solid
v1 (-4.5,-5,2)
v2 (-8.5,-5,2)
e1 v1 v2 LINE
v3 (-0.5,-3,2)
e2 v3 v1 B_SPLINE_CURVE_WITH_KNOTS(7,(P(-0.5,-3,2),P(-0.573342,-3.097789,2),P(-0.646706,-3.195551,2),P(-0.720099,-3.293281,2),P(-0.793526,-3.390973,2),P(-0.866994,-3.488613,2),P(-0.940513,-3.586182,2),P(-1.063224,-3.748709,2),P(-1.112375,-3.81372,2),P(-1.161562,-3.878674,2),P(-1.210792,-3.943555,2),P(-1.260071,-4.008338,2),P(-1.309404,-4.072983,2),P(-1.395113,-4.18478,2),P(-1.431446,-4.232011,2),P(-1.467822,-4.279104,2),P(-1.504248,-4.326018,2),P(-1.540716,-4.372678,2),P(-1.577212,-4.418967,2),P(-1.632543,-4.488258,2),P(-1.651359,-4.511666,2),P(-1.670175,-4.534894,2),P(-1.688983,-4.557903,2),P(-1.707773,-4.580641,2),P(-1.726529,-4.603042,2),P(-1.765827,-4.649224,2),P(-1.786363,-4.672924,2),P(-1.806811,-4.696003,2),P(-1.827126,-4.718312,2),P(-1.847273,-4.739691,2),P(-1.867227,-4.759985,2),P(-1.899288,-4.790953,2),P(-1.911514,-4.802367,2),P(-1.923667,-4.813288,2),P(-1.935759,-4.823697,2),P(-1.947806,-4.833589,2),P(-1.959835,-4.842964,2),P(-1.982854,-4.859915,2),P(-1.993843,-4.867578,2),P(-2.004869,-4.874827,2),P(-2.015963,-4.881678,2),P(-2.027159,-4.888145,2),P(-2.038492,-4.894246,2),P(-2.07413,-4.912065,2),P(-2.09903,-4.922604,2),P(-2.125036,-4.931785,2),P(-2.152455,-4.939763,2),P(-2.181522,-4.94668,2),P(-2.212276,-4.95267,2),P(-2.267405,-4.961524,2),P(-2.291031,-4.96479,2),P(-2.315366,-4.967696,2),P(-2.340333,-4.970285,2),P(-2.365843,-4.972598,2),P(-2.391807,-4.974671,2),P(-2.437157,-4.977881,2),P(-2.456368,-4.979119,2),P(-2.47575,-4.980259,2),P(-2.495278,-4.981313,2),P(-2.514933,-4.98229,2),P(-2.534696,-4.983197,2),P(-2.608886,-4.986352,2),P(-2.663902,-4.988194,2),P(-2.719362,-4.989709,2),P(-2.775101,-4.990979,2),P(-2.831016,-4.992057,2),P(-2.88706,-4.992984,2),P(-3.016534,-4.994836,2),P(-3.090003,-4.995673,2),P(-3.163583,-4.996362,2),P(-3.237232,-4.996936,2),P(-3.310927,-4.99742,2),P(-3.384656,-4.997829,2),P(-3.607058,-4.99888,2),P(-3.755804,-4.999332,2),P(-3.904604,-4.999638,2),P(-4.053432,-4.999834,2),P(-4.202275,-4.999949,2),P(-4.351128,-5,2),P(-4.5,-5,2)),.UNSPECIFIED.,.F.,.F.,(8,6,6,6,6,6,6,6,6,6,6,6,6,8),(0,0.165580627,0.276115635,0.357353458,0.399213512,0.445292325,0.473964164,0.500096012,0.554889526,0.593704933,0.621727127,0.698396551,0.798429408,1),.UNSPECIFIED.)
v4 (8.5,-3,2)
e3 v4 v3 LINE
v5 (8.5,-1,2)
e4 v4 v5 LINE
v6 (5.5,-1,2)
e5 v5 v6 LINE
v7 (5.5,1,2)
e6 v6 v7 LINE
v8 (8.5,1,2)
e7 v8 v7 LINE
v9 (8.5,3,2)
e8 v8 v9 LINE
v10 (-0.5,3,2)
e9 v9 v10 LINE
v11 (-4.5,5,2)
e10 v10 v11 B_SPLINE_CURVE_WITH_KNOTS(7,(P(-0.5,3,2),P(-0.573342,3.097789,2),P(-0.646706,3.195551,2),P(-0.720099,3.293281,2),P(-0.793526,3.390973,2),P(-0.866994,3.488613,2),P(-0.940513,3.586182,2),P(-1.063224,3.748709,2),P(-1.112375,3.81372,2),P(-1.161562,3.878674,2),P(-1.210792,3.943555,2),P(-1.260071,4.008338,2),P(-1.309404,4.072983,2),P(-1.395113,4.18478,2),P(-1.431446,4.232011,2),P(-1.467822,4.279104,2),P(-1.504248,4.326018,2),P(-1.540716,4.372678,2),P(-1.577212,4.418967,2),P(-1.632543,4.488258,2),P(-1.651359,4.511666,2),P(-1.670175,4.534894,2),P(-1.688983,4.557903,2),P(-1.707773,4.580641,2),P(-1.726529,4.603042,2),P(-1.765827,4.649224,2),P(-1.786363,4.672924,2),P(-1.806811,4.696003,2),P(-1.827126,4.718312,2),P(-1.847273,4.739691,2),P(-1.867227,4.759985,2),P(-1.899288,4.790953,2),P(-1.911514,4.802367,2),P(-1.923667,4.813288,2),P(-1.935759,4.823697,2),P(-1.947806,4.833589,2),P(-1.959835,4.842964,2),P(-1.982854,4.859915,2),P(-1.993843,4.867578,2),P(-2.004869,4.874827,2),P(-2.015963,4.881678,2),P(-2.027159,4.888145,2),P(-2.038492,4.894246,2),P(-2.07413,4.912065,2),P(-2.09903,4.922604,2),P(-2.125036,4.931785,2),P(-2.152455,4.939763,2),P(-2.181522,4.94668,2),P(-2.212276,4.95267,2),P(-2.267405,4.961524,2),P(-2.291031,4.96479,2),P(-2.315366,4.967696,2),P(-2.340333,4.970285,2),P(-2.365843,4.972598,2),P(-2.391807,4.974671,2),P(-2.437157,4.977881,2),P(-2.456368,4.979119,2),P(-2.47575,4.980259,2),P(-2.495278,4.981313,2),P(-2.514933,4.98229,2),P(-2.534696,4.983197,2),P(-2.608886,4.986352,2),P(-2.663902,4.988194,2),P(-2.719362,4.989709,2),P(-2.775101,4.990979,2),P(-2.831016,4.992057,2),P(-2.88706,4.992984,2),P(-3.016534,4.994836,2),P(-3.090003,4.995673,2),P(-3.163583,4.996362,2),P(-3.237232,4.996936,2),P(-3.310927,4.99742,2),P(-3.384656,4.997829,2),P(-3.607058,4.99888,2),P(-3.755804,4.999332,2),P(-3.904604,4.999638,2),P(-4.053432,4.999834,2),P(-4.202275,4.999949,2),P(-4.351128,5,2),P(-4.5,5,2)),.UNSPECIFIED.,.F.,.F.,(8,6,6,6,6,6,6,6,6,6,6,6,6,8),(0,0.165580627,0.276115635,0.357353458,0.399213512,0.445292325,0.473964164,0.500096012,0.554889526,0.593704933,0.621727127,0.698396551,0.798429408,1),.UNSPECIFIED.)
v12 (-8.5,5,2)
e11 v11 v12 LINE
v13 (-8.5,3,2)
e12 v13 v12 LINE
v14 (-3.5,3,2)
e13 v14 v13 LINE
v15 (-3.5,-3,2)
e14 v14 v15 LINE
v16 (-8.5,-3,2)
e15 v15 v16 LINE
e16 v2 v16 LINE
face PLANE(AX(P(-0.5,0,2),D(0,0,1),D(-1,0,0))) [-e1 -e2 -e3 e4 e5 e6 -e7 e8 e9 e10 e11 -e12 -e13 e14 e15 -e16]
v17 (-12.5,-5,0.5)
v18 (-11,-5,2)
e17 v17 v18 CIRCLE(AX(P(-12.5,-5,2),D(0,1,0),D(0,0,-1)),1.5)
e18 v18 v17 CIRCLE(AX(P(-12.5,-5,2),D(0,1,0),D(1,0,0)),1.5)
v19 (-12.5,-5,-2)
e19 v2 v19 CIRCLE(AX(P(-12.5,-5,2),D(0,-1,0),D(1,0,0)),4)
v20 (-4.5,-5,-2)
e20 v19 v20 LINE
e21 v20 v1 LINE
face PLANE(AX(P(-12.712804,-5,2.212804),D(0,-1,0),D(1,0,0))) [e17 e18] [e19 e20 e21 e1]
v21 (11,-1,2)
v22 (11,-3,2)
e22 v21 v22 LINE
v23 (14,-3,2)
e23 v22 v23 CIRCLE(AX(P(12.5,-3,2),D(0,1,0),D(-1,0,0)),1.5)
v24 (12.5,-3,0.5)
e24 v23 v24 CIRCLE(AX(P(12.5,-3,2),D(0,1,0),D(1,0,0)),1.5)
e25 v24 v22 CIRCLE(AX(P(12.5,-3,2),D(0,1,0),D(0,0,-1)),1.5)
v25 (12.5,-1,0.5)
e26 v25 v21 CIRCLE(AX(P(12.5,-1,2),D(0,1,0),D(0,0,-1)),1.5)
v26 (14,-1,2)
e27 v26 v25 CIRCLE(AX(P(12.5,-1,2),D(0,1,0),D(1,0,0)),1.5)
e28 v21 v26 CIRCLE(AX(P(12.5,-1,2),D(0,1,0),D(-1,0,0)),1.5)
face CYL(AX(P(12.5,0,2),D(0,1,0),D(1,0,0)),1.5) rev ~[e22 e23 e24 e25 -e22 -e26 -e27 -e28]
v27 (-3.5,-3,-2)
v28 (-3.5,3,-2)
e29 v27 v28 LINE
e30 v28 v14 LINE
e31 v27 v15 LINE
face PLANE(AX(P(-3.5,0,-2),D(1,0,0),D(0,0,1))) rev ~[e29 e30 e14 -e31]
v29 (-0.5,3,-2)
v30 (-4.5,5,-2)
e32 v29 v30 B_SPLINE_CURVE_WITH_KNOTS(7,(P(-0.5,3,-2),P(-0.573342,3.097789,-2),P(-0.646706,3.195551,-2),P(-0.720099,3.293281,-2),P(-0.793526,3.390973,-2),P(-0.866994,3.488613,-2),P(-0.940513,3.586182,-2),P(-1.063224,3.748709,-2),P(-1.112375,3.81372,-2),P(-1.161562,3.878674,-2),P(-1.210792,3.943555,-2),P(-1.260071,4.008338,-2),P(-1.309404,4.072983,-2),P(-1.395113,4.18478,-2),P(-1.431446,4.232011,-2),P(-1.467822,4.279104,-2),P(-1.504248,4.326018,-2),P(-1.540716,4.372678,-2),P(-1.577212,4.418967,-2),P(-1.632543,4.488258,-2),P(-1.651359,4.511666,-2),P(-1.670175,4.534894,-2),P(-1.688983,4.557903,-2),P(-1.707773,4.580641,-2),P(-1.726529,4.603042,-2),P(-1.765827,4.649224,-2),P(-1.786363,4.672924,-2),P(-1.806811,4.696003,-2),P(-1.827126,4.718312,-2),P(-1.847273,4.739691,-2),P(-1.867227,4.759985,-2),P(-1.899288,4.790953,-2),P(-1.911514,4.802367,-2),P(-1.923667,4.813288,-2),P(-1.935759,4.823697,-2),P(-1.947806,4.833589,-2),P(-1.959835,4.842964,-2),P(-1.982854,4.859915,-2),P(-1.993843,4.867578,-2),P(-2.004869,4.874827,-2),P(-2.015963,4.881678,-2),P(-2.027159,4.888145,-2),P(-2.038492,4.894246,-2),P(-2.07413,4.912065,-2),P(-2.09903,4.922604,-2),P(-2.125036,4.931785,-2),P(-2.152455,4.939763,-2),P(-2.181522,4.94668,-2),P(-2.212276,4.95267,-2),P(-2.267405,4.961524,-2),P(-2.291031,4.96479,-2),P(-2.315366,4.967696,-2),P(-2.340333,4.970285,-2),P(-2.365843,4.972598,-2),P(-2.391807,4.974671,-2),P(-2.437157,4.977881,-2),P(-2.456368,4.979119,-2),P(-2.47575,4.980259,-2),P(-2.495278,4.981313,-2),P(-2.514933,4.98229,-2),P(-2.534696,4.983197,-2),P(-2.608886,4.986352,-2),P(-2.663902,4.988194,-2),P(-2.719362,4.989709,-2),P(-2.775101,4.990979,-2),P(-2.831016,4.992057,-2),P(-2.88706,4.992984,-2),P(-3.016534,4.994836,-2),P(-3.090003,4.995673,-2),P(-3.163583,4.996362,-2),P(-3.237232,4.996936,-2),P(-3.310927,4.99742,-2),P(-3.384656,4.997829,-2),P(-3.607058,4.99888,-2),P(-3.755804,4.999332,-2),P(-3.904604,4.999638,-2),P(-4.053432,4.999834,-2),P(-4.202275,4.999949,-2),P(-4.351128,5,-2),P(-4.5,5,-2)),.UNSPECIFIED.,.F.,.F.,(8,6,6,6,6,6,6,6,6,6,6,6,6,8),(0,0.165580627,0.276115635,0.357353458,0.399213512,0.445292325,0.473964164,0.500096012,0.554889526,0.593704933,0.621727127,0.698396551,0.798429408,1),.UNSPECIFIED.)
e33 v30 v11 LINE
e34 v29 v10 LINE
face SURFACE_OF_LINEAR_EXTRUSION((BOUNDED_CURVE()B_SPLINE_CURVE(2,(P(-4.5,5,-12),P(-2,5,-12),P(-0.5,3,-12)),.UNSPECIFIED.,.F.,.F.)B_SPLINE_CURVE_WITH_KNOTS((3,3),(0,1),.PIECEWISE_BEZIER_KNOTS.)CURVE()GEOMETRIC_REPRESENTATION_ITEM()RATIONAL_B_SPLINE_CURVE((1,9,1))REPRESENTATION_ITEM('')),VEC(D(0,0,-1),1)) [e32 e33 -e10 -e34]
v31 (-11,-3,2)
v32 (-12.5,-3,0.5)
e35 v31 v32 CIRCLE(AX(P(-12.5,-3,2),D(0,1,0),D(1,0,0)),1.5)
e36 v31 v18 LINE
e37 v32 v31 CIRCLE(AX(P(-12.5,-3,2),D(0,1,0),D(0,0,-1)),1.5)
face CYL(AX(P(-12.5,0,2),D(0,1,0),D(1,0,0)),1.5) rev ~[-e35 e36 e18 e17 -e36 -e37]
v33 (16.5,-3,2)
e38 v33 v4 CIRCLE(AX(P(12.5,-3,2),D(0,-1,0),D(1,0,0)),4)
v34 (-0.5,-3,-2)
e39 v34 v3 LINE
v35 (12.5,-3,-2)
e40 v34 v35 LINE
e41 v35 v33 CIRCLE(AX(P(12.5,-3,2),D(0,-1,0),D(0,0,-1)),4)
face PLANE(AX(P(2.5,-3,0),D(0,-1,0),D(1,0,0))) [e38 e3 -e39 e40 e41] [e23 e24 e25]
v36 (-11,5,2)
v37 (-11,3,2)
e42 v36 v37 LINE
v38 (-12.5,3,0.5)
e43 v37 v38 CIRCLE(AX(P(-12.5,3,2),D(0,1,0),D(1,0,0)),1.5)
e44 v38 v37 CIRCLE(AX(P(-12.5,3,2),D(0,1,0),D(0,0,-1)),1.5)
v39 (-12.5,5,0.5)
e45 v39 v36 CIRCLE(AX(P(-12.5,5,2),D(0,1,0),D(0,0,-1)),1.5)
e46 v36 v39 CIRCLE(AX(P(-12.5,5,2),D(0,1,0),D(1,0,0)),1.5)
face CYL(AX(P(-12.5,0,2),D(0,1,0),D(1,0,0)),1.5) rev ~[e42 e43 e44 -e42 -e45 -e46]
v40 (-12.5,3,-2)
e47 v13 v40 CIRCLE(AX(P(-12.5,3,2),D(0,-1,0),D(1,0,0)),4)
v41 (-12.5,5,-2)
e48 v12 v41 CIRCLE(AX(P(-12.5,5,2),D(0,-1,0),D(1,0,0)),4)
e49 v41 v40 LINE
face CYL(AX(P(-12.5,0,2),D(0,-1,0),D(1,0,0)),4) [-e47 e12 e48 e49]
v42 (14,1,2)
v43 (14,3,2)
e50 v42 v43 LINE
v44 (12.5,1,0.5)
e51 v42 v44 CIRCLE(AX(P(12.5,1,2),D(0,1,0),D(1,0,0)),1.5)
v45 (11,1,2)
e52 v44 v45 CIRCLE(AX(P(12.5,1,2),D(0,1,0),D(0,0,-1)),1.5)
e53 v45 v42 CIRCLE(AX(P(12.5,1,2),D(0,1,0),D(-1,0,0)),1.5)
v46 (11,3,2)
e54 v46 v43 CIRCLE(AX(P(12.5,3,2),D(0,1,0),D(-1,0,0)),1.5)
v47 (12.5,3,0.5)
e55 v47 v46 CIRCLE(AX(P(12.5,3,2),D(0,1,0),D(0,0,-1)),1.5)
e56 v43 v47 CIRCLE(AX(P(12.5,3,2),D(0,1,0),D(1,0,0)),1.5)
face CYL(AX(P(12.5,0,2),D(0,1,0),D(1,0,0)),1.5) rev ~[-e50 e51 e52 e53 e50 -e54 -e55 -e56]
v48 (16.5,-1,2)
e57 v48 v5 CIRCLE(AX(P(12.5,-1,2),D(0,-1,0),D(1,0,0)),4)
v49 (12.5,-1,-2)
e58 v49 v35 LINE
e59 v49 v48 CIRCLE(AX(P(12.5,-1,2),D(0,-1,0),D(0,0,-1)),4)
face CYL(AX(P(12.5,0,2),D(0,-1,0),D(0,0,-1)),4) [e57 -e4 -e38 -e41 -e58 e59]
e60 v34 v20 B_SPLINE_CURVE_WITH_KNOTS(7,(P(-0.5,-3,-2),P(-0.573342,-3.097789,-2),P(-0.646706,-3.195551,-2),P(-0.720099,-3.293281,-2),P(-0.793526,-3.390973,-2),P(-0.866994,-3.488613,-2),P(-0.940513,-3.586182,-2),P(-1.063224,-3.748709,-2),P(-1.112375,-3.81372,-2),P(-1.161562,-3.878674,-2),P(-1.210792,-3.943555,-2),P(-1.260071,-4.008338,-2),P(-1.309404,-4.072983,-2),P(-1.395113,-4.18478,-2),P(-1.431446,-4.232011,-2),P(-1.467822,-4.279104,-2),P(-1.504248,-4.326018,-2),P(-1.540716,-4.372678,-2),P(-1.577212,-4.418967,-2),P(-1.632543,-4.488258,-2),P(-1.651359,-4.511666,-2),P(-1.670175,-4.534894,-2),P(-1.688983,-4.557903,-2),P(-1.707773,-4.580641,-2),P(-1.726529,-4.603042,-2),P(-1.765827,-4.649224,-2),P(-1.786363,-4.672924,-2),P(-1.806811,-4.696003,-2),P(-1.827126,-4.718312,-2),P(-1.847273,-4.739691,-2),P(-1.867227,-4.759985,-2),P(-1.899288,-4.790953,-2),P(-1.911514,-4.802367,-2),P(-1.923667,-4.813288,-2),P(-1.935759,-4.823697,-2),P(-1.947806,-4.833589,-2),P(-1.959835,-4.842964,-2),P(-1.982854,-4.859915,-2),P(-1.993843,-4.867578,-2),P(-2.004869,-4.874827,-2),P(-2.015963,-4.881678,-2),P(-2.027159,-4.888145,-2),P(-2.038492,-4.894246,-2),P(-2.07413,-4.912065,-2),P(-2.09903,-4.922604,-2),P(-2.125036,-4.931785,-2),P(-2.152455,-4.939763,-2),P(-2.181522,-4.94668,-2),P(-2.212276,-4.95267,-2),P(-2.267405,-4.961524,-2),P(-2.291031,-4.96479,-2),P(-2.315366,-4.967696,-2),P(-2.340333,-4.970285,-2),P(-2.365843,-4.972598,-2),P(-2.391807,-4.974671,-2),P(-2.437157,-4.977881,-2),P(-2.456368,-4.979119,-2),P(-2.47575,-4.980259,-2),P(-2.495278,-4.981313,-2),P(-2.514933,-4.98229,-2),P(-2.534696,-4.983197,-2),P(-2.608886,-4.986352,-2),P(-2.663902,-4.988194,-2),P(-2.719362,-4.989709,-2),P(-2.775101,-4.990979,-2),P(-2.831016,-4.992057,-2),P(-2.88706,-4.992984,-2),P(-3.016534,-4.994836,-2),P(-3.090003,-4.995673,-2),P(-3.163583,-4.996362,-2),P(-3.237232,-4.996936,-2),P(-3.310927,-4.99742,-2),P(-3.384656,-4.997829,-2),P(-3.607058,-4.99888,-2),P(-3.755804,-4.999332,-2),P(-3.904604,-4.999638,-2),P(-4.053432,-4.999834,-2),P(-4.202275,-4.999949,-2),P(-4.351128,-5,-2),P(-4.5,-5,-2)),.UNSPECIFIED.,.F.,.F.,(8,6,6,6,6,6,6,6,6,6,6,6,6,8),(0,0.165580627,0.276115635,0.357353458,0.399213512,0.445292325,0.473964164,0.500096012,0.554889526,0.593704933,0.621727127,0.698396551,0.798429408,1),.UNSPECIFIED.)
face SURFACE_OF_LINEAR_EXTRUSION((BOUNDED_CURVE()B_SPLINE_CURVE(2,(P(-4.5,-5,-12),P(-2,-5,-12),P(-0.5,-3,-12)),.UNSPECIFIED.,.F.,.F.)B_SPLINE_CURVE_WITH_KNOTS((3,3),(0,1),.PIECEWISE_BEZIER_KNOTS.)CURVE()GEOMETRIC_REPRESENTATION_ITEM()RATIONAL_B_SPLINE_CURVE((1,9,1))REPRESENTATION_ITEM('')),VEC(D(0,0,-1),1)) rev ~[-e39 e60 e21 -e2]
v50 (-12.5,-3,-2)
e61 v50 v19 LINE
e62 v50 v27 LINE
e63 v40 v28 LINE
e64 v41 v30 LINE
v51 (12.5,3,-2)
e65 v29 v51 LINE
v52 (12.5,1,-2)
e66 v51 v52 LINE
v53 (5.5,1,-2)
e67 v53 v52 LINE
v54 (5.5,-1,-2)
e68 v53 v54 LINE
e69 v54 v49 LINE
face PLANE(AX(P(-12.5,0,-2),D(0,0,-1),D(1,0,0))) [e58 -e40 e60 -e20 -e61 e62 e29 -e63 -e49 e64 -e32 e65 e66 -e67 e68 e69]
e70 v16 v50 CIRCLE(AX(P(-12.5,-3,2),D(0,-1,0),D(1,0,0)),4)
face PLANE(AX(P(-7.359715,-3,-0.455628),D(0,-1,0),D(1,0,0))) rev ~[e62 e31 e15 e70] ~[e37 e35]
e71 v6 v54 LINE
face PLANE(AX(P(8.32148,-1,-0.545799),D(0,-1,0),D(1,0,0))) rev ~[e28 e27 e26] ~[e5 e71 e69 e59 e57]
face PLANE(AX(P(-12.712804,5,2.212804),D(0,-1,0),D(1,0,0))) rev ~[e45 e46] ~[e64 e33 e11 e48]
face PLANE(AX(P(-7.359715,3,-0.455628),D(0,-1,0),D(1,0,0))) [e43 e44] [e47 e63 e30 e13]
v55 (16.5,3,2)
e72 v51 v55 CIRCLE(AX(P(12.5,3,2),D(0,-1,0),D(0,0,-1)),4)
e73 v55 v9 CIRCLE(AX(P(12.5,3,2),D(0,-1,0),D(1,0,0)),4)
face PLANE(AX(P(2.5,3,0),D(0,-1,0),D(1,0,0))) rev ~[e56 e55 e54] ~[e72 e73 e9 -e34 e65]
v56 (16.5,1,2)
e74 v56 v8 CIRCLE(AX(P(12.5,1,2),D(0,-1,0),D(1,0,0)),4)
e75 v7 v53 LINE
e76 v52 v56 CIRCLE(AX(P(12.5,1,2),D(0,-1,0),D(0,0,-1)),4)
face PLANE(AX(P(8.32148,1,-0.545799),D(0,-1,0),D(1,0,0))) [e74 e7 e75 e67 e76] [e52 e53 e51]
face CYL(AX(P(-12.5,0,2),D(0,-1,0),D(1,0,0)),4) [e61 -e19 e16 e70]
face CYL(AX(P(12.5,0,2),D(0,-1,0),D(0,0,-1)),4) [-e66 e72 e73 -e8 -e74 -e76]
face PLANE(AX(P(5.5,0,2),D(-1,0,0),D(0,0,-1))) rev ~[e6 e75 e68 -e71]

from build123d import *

# Parameters (mm, degrees)
F0_W        = 3
F0_H        = 4
F1_DEPTH    = 5
F0_W_2      = 6
F2_DEPTH    = 3
F3_DEPTH    = 3
F4_DEPTH    = 1
F5_T1_DEPTH = 24


# Not quite as in the source:
# - a fillet or chamfer that OpenCascade refuses, or shapes differently, is made with other operations: its cross-section is extruded or revolved along the edge and cut away or added


with BuildPart() as f1:
    # F0 (on Front) → F1 (new body, symmetric)
    with BuildSketch(Plane.XZ):
        with BuildLine():
            Line((-11, 2), (-8.5, 2))
            ThreePointArc((-8.5, 2), (-15.3284271247, 4.8284271247), (-12.5, -2))
            Line((-12.5, -2), (-12.5, 0.5))
            ThreePointArc((-12.5, 0.5), (-13.5606601718, 3.0606601718), (-11, 2))
        make_face()
        with BuildLine():
            ThreePointArc((-12.5, -2), (-9.6715728753, -0.8284271247), (-8.5, 2))
            Line((-8.5, 2), (-11, 2))
            ThreePointArc((-11, 2), (-11.4393398282, 0.9393398282), (-12.5, 0.5))
            Line((-12.5, 0.5), (-12.5, -2))
        make_face()
        with BuildLine():
            Line((-3.5, -2), (-3.5, 2))
            Line((-3.5, 2), (-8.5, 2))
            ThreePointArc((-8.5, 2), (-9.6715728753, -0.8284271247), (-12.5, -2))
            Line((-12.5, -2), (-3.5, -2))
        make_face()
        with Locations((-2, 0)):
            Rectangle(F0_W, F0_H)
    extrude(amount=F1_DEPTH, both=True)

    # F0 (on Front) → F2 (join, symmetric)
    with BuildSketch(Plane.XZ):
        with Locations((2.5, 0)):
            Rectangle(F0_W_2, F0_H)
        with BuildLine():
            Line((8.5, 2), (5.5, 2))
            Line((5.5, 2), (5.5, -2))
            Line((5.5, -2), (12.5, -2))
            ThreePointArc((12.5, -2), (9.6715728753, -0.8284271247), (8.5, 2))
        make_face()
        with BuildLine():
            Line((11, 2), (8.5, 2))
            ThreePointArc((8.5, 2), (9.6715728753, -0.8284271247), (12.5, -2))
            Line((12.5, -2), (12.5, 0.5))
            ThreePointArc((12.5, 0.5), (11.4393398282, 0.9393398282), (11, 2))
        make_face()
        with BuildLine():
            ThreePointArc((16.5, 2), (12.5, 6), (8.5, 2))
            Line((8.5, 2), (11, 2))
            ThreePointArc((11, 2), (12.5, 3.5), (14, 2))
            ThreePointArc((14, 2), (13.5606601718, 0.9393398282), (12.5, 0.5))
            Line((12.5, 0.5), (12.5, -2))
            ThreePointArc((12.5, -2), (15.3284271247, -0.8284271247), (16.5, 2))
        make_face()
    extrude(amount=F2_DEPTH, both=True)

    # F0 (on Front) → F3 (cut, symmetric)
    with BuildSketch(Plane.XZ):
        with BuildLine():
            Line((-3.5, -2), (-3.5, 2))
            Line((-3.5, 2), (-8.5, 2))
            ThreePointArc((-8.5, 2), (-9.6715728753, -0.8284271247), (-12.5, -2))
            Line((-12.5, -2), (-3.5, -2))
        make_face()
        with BuildLine():
            ThreePointArc((-12.5, -2), (-9.6715728753, -0.8284271247), (-8.5, 2))
            Line((-8.5, 2), (-11, 2))
            ThreePointArc((-11, 2), (-11.4393398282, 0.9393398282), (-12.5, 0.5))
            Line((-12.5, 0.5), (-12.5, -2))
        make_face()
        with BuildLine():
            Line((-11, 2), (-8.5, 2))
            ThreePointArc((-8.5, 2), (-15.3284271247, 4.8284271247), (-12.5, -2))
            Line((-12.5, -2), (-12.5, 0.5))
            ThreePointArc((-12.5, 0.5), (-13.5606601718, 3.0606601718), (-11, 2))
        make_face()
    extrude(amount=F3_DEPTH, both=True, mode=Mode.SUBTRACT)

    # F0 (on Front) → F4 (cut, symmetric)
    with BuildSketch(Plane.XZ):
        with BuildLine():
            Line((8.5, 2), (5.5, 2))
            Line((5.5, 2), (5.5, -2))
            Line((5.5, -2), (12.5, -2))
            ThreePointArc((12.5, -2), (9.6715728753, -0.8284271247), (8.5, 2))
        make_face()
        with BuildLine():
            Line((11, 2), (8.5, 2))
            ThreePointArc((8.5, 2), (9.6715728753, -0.8284271247), (12.5, -2))
            Line((12.5, -2), (12.5, 0.5))
            ThreePointArc((12.5, 0.5), (11.4393398282, 0.9393398282), (11, 2))
        make_face()
        with BuildLine():
            ThreePointArc((16.5, 2), (12.5, 6), (8.5, 2))
            Line((8.5, 2), (11, 2))
            ThreePointArc((11, 2), (12.5, 3.5), (14, 2))
            ThreePointArc((14, 2), (13.5606601718, 0.9393398282), (12.5, 0.5))
            Line((12.5, 0.5), (12.5, -2))
            ThreePointArc((12.5, -2), (15.3284271247, -0.8284271247), (16.5, 2))
        make_face()
    extrude(amount=F4_DEPTH, both=True, mode=Mode.SUBTRACT)

    # F5: fillet of radius 5 on 2 edges, made by hand

    # F5_s2 → F5_t1 (cut)
    with BuildSketch(Plane.XY.offset(-12)):
        with BuildLine():
            add(Edge.make_bspline(
                [(-4.5, -5), (-2, -5), (-0.5, -3)],
                knots=[0, 0, 0, 1, 1, 1], degree=2, weights=[1, 9, 1]))
            Line((-0.5, -3), (-0.5, -5))
            Line((-0.5, -5), (-4.5, -5))
        make_face()
        with BuildLine():
            add(Edge.make_bspline(
                [(-4.5, 5), (-2, 5), (-0.5, 3)],
                knots=[0, 0, 0, 1, 1, 1], degree=2, weights=[1, 9, 1]))
            Line((-0.5, 3), (-0.5, 5))
            Line((-0.5, 5), (-4.5, 5))
        make_face()
    extrude(amount=F5_T1_DEPTH, mode=Mode.SUBTRACT)


solid = f1.part
